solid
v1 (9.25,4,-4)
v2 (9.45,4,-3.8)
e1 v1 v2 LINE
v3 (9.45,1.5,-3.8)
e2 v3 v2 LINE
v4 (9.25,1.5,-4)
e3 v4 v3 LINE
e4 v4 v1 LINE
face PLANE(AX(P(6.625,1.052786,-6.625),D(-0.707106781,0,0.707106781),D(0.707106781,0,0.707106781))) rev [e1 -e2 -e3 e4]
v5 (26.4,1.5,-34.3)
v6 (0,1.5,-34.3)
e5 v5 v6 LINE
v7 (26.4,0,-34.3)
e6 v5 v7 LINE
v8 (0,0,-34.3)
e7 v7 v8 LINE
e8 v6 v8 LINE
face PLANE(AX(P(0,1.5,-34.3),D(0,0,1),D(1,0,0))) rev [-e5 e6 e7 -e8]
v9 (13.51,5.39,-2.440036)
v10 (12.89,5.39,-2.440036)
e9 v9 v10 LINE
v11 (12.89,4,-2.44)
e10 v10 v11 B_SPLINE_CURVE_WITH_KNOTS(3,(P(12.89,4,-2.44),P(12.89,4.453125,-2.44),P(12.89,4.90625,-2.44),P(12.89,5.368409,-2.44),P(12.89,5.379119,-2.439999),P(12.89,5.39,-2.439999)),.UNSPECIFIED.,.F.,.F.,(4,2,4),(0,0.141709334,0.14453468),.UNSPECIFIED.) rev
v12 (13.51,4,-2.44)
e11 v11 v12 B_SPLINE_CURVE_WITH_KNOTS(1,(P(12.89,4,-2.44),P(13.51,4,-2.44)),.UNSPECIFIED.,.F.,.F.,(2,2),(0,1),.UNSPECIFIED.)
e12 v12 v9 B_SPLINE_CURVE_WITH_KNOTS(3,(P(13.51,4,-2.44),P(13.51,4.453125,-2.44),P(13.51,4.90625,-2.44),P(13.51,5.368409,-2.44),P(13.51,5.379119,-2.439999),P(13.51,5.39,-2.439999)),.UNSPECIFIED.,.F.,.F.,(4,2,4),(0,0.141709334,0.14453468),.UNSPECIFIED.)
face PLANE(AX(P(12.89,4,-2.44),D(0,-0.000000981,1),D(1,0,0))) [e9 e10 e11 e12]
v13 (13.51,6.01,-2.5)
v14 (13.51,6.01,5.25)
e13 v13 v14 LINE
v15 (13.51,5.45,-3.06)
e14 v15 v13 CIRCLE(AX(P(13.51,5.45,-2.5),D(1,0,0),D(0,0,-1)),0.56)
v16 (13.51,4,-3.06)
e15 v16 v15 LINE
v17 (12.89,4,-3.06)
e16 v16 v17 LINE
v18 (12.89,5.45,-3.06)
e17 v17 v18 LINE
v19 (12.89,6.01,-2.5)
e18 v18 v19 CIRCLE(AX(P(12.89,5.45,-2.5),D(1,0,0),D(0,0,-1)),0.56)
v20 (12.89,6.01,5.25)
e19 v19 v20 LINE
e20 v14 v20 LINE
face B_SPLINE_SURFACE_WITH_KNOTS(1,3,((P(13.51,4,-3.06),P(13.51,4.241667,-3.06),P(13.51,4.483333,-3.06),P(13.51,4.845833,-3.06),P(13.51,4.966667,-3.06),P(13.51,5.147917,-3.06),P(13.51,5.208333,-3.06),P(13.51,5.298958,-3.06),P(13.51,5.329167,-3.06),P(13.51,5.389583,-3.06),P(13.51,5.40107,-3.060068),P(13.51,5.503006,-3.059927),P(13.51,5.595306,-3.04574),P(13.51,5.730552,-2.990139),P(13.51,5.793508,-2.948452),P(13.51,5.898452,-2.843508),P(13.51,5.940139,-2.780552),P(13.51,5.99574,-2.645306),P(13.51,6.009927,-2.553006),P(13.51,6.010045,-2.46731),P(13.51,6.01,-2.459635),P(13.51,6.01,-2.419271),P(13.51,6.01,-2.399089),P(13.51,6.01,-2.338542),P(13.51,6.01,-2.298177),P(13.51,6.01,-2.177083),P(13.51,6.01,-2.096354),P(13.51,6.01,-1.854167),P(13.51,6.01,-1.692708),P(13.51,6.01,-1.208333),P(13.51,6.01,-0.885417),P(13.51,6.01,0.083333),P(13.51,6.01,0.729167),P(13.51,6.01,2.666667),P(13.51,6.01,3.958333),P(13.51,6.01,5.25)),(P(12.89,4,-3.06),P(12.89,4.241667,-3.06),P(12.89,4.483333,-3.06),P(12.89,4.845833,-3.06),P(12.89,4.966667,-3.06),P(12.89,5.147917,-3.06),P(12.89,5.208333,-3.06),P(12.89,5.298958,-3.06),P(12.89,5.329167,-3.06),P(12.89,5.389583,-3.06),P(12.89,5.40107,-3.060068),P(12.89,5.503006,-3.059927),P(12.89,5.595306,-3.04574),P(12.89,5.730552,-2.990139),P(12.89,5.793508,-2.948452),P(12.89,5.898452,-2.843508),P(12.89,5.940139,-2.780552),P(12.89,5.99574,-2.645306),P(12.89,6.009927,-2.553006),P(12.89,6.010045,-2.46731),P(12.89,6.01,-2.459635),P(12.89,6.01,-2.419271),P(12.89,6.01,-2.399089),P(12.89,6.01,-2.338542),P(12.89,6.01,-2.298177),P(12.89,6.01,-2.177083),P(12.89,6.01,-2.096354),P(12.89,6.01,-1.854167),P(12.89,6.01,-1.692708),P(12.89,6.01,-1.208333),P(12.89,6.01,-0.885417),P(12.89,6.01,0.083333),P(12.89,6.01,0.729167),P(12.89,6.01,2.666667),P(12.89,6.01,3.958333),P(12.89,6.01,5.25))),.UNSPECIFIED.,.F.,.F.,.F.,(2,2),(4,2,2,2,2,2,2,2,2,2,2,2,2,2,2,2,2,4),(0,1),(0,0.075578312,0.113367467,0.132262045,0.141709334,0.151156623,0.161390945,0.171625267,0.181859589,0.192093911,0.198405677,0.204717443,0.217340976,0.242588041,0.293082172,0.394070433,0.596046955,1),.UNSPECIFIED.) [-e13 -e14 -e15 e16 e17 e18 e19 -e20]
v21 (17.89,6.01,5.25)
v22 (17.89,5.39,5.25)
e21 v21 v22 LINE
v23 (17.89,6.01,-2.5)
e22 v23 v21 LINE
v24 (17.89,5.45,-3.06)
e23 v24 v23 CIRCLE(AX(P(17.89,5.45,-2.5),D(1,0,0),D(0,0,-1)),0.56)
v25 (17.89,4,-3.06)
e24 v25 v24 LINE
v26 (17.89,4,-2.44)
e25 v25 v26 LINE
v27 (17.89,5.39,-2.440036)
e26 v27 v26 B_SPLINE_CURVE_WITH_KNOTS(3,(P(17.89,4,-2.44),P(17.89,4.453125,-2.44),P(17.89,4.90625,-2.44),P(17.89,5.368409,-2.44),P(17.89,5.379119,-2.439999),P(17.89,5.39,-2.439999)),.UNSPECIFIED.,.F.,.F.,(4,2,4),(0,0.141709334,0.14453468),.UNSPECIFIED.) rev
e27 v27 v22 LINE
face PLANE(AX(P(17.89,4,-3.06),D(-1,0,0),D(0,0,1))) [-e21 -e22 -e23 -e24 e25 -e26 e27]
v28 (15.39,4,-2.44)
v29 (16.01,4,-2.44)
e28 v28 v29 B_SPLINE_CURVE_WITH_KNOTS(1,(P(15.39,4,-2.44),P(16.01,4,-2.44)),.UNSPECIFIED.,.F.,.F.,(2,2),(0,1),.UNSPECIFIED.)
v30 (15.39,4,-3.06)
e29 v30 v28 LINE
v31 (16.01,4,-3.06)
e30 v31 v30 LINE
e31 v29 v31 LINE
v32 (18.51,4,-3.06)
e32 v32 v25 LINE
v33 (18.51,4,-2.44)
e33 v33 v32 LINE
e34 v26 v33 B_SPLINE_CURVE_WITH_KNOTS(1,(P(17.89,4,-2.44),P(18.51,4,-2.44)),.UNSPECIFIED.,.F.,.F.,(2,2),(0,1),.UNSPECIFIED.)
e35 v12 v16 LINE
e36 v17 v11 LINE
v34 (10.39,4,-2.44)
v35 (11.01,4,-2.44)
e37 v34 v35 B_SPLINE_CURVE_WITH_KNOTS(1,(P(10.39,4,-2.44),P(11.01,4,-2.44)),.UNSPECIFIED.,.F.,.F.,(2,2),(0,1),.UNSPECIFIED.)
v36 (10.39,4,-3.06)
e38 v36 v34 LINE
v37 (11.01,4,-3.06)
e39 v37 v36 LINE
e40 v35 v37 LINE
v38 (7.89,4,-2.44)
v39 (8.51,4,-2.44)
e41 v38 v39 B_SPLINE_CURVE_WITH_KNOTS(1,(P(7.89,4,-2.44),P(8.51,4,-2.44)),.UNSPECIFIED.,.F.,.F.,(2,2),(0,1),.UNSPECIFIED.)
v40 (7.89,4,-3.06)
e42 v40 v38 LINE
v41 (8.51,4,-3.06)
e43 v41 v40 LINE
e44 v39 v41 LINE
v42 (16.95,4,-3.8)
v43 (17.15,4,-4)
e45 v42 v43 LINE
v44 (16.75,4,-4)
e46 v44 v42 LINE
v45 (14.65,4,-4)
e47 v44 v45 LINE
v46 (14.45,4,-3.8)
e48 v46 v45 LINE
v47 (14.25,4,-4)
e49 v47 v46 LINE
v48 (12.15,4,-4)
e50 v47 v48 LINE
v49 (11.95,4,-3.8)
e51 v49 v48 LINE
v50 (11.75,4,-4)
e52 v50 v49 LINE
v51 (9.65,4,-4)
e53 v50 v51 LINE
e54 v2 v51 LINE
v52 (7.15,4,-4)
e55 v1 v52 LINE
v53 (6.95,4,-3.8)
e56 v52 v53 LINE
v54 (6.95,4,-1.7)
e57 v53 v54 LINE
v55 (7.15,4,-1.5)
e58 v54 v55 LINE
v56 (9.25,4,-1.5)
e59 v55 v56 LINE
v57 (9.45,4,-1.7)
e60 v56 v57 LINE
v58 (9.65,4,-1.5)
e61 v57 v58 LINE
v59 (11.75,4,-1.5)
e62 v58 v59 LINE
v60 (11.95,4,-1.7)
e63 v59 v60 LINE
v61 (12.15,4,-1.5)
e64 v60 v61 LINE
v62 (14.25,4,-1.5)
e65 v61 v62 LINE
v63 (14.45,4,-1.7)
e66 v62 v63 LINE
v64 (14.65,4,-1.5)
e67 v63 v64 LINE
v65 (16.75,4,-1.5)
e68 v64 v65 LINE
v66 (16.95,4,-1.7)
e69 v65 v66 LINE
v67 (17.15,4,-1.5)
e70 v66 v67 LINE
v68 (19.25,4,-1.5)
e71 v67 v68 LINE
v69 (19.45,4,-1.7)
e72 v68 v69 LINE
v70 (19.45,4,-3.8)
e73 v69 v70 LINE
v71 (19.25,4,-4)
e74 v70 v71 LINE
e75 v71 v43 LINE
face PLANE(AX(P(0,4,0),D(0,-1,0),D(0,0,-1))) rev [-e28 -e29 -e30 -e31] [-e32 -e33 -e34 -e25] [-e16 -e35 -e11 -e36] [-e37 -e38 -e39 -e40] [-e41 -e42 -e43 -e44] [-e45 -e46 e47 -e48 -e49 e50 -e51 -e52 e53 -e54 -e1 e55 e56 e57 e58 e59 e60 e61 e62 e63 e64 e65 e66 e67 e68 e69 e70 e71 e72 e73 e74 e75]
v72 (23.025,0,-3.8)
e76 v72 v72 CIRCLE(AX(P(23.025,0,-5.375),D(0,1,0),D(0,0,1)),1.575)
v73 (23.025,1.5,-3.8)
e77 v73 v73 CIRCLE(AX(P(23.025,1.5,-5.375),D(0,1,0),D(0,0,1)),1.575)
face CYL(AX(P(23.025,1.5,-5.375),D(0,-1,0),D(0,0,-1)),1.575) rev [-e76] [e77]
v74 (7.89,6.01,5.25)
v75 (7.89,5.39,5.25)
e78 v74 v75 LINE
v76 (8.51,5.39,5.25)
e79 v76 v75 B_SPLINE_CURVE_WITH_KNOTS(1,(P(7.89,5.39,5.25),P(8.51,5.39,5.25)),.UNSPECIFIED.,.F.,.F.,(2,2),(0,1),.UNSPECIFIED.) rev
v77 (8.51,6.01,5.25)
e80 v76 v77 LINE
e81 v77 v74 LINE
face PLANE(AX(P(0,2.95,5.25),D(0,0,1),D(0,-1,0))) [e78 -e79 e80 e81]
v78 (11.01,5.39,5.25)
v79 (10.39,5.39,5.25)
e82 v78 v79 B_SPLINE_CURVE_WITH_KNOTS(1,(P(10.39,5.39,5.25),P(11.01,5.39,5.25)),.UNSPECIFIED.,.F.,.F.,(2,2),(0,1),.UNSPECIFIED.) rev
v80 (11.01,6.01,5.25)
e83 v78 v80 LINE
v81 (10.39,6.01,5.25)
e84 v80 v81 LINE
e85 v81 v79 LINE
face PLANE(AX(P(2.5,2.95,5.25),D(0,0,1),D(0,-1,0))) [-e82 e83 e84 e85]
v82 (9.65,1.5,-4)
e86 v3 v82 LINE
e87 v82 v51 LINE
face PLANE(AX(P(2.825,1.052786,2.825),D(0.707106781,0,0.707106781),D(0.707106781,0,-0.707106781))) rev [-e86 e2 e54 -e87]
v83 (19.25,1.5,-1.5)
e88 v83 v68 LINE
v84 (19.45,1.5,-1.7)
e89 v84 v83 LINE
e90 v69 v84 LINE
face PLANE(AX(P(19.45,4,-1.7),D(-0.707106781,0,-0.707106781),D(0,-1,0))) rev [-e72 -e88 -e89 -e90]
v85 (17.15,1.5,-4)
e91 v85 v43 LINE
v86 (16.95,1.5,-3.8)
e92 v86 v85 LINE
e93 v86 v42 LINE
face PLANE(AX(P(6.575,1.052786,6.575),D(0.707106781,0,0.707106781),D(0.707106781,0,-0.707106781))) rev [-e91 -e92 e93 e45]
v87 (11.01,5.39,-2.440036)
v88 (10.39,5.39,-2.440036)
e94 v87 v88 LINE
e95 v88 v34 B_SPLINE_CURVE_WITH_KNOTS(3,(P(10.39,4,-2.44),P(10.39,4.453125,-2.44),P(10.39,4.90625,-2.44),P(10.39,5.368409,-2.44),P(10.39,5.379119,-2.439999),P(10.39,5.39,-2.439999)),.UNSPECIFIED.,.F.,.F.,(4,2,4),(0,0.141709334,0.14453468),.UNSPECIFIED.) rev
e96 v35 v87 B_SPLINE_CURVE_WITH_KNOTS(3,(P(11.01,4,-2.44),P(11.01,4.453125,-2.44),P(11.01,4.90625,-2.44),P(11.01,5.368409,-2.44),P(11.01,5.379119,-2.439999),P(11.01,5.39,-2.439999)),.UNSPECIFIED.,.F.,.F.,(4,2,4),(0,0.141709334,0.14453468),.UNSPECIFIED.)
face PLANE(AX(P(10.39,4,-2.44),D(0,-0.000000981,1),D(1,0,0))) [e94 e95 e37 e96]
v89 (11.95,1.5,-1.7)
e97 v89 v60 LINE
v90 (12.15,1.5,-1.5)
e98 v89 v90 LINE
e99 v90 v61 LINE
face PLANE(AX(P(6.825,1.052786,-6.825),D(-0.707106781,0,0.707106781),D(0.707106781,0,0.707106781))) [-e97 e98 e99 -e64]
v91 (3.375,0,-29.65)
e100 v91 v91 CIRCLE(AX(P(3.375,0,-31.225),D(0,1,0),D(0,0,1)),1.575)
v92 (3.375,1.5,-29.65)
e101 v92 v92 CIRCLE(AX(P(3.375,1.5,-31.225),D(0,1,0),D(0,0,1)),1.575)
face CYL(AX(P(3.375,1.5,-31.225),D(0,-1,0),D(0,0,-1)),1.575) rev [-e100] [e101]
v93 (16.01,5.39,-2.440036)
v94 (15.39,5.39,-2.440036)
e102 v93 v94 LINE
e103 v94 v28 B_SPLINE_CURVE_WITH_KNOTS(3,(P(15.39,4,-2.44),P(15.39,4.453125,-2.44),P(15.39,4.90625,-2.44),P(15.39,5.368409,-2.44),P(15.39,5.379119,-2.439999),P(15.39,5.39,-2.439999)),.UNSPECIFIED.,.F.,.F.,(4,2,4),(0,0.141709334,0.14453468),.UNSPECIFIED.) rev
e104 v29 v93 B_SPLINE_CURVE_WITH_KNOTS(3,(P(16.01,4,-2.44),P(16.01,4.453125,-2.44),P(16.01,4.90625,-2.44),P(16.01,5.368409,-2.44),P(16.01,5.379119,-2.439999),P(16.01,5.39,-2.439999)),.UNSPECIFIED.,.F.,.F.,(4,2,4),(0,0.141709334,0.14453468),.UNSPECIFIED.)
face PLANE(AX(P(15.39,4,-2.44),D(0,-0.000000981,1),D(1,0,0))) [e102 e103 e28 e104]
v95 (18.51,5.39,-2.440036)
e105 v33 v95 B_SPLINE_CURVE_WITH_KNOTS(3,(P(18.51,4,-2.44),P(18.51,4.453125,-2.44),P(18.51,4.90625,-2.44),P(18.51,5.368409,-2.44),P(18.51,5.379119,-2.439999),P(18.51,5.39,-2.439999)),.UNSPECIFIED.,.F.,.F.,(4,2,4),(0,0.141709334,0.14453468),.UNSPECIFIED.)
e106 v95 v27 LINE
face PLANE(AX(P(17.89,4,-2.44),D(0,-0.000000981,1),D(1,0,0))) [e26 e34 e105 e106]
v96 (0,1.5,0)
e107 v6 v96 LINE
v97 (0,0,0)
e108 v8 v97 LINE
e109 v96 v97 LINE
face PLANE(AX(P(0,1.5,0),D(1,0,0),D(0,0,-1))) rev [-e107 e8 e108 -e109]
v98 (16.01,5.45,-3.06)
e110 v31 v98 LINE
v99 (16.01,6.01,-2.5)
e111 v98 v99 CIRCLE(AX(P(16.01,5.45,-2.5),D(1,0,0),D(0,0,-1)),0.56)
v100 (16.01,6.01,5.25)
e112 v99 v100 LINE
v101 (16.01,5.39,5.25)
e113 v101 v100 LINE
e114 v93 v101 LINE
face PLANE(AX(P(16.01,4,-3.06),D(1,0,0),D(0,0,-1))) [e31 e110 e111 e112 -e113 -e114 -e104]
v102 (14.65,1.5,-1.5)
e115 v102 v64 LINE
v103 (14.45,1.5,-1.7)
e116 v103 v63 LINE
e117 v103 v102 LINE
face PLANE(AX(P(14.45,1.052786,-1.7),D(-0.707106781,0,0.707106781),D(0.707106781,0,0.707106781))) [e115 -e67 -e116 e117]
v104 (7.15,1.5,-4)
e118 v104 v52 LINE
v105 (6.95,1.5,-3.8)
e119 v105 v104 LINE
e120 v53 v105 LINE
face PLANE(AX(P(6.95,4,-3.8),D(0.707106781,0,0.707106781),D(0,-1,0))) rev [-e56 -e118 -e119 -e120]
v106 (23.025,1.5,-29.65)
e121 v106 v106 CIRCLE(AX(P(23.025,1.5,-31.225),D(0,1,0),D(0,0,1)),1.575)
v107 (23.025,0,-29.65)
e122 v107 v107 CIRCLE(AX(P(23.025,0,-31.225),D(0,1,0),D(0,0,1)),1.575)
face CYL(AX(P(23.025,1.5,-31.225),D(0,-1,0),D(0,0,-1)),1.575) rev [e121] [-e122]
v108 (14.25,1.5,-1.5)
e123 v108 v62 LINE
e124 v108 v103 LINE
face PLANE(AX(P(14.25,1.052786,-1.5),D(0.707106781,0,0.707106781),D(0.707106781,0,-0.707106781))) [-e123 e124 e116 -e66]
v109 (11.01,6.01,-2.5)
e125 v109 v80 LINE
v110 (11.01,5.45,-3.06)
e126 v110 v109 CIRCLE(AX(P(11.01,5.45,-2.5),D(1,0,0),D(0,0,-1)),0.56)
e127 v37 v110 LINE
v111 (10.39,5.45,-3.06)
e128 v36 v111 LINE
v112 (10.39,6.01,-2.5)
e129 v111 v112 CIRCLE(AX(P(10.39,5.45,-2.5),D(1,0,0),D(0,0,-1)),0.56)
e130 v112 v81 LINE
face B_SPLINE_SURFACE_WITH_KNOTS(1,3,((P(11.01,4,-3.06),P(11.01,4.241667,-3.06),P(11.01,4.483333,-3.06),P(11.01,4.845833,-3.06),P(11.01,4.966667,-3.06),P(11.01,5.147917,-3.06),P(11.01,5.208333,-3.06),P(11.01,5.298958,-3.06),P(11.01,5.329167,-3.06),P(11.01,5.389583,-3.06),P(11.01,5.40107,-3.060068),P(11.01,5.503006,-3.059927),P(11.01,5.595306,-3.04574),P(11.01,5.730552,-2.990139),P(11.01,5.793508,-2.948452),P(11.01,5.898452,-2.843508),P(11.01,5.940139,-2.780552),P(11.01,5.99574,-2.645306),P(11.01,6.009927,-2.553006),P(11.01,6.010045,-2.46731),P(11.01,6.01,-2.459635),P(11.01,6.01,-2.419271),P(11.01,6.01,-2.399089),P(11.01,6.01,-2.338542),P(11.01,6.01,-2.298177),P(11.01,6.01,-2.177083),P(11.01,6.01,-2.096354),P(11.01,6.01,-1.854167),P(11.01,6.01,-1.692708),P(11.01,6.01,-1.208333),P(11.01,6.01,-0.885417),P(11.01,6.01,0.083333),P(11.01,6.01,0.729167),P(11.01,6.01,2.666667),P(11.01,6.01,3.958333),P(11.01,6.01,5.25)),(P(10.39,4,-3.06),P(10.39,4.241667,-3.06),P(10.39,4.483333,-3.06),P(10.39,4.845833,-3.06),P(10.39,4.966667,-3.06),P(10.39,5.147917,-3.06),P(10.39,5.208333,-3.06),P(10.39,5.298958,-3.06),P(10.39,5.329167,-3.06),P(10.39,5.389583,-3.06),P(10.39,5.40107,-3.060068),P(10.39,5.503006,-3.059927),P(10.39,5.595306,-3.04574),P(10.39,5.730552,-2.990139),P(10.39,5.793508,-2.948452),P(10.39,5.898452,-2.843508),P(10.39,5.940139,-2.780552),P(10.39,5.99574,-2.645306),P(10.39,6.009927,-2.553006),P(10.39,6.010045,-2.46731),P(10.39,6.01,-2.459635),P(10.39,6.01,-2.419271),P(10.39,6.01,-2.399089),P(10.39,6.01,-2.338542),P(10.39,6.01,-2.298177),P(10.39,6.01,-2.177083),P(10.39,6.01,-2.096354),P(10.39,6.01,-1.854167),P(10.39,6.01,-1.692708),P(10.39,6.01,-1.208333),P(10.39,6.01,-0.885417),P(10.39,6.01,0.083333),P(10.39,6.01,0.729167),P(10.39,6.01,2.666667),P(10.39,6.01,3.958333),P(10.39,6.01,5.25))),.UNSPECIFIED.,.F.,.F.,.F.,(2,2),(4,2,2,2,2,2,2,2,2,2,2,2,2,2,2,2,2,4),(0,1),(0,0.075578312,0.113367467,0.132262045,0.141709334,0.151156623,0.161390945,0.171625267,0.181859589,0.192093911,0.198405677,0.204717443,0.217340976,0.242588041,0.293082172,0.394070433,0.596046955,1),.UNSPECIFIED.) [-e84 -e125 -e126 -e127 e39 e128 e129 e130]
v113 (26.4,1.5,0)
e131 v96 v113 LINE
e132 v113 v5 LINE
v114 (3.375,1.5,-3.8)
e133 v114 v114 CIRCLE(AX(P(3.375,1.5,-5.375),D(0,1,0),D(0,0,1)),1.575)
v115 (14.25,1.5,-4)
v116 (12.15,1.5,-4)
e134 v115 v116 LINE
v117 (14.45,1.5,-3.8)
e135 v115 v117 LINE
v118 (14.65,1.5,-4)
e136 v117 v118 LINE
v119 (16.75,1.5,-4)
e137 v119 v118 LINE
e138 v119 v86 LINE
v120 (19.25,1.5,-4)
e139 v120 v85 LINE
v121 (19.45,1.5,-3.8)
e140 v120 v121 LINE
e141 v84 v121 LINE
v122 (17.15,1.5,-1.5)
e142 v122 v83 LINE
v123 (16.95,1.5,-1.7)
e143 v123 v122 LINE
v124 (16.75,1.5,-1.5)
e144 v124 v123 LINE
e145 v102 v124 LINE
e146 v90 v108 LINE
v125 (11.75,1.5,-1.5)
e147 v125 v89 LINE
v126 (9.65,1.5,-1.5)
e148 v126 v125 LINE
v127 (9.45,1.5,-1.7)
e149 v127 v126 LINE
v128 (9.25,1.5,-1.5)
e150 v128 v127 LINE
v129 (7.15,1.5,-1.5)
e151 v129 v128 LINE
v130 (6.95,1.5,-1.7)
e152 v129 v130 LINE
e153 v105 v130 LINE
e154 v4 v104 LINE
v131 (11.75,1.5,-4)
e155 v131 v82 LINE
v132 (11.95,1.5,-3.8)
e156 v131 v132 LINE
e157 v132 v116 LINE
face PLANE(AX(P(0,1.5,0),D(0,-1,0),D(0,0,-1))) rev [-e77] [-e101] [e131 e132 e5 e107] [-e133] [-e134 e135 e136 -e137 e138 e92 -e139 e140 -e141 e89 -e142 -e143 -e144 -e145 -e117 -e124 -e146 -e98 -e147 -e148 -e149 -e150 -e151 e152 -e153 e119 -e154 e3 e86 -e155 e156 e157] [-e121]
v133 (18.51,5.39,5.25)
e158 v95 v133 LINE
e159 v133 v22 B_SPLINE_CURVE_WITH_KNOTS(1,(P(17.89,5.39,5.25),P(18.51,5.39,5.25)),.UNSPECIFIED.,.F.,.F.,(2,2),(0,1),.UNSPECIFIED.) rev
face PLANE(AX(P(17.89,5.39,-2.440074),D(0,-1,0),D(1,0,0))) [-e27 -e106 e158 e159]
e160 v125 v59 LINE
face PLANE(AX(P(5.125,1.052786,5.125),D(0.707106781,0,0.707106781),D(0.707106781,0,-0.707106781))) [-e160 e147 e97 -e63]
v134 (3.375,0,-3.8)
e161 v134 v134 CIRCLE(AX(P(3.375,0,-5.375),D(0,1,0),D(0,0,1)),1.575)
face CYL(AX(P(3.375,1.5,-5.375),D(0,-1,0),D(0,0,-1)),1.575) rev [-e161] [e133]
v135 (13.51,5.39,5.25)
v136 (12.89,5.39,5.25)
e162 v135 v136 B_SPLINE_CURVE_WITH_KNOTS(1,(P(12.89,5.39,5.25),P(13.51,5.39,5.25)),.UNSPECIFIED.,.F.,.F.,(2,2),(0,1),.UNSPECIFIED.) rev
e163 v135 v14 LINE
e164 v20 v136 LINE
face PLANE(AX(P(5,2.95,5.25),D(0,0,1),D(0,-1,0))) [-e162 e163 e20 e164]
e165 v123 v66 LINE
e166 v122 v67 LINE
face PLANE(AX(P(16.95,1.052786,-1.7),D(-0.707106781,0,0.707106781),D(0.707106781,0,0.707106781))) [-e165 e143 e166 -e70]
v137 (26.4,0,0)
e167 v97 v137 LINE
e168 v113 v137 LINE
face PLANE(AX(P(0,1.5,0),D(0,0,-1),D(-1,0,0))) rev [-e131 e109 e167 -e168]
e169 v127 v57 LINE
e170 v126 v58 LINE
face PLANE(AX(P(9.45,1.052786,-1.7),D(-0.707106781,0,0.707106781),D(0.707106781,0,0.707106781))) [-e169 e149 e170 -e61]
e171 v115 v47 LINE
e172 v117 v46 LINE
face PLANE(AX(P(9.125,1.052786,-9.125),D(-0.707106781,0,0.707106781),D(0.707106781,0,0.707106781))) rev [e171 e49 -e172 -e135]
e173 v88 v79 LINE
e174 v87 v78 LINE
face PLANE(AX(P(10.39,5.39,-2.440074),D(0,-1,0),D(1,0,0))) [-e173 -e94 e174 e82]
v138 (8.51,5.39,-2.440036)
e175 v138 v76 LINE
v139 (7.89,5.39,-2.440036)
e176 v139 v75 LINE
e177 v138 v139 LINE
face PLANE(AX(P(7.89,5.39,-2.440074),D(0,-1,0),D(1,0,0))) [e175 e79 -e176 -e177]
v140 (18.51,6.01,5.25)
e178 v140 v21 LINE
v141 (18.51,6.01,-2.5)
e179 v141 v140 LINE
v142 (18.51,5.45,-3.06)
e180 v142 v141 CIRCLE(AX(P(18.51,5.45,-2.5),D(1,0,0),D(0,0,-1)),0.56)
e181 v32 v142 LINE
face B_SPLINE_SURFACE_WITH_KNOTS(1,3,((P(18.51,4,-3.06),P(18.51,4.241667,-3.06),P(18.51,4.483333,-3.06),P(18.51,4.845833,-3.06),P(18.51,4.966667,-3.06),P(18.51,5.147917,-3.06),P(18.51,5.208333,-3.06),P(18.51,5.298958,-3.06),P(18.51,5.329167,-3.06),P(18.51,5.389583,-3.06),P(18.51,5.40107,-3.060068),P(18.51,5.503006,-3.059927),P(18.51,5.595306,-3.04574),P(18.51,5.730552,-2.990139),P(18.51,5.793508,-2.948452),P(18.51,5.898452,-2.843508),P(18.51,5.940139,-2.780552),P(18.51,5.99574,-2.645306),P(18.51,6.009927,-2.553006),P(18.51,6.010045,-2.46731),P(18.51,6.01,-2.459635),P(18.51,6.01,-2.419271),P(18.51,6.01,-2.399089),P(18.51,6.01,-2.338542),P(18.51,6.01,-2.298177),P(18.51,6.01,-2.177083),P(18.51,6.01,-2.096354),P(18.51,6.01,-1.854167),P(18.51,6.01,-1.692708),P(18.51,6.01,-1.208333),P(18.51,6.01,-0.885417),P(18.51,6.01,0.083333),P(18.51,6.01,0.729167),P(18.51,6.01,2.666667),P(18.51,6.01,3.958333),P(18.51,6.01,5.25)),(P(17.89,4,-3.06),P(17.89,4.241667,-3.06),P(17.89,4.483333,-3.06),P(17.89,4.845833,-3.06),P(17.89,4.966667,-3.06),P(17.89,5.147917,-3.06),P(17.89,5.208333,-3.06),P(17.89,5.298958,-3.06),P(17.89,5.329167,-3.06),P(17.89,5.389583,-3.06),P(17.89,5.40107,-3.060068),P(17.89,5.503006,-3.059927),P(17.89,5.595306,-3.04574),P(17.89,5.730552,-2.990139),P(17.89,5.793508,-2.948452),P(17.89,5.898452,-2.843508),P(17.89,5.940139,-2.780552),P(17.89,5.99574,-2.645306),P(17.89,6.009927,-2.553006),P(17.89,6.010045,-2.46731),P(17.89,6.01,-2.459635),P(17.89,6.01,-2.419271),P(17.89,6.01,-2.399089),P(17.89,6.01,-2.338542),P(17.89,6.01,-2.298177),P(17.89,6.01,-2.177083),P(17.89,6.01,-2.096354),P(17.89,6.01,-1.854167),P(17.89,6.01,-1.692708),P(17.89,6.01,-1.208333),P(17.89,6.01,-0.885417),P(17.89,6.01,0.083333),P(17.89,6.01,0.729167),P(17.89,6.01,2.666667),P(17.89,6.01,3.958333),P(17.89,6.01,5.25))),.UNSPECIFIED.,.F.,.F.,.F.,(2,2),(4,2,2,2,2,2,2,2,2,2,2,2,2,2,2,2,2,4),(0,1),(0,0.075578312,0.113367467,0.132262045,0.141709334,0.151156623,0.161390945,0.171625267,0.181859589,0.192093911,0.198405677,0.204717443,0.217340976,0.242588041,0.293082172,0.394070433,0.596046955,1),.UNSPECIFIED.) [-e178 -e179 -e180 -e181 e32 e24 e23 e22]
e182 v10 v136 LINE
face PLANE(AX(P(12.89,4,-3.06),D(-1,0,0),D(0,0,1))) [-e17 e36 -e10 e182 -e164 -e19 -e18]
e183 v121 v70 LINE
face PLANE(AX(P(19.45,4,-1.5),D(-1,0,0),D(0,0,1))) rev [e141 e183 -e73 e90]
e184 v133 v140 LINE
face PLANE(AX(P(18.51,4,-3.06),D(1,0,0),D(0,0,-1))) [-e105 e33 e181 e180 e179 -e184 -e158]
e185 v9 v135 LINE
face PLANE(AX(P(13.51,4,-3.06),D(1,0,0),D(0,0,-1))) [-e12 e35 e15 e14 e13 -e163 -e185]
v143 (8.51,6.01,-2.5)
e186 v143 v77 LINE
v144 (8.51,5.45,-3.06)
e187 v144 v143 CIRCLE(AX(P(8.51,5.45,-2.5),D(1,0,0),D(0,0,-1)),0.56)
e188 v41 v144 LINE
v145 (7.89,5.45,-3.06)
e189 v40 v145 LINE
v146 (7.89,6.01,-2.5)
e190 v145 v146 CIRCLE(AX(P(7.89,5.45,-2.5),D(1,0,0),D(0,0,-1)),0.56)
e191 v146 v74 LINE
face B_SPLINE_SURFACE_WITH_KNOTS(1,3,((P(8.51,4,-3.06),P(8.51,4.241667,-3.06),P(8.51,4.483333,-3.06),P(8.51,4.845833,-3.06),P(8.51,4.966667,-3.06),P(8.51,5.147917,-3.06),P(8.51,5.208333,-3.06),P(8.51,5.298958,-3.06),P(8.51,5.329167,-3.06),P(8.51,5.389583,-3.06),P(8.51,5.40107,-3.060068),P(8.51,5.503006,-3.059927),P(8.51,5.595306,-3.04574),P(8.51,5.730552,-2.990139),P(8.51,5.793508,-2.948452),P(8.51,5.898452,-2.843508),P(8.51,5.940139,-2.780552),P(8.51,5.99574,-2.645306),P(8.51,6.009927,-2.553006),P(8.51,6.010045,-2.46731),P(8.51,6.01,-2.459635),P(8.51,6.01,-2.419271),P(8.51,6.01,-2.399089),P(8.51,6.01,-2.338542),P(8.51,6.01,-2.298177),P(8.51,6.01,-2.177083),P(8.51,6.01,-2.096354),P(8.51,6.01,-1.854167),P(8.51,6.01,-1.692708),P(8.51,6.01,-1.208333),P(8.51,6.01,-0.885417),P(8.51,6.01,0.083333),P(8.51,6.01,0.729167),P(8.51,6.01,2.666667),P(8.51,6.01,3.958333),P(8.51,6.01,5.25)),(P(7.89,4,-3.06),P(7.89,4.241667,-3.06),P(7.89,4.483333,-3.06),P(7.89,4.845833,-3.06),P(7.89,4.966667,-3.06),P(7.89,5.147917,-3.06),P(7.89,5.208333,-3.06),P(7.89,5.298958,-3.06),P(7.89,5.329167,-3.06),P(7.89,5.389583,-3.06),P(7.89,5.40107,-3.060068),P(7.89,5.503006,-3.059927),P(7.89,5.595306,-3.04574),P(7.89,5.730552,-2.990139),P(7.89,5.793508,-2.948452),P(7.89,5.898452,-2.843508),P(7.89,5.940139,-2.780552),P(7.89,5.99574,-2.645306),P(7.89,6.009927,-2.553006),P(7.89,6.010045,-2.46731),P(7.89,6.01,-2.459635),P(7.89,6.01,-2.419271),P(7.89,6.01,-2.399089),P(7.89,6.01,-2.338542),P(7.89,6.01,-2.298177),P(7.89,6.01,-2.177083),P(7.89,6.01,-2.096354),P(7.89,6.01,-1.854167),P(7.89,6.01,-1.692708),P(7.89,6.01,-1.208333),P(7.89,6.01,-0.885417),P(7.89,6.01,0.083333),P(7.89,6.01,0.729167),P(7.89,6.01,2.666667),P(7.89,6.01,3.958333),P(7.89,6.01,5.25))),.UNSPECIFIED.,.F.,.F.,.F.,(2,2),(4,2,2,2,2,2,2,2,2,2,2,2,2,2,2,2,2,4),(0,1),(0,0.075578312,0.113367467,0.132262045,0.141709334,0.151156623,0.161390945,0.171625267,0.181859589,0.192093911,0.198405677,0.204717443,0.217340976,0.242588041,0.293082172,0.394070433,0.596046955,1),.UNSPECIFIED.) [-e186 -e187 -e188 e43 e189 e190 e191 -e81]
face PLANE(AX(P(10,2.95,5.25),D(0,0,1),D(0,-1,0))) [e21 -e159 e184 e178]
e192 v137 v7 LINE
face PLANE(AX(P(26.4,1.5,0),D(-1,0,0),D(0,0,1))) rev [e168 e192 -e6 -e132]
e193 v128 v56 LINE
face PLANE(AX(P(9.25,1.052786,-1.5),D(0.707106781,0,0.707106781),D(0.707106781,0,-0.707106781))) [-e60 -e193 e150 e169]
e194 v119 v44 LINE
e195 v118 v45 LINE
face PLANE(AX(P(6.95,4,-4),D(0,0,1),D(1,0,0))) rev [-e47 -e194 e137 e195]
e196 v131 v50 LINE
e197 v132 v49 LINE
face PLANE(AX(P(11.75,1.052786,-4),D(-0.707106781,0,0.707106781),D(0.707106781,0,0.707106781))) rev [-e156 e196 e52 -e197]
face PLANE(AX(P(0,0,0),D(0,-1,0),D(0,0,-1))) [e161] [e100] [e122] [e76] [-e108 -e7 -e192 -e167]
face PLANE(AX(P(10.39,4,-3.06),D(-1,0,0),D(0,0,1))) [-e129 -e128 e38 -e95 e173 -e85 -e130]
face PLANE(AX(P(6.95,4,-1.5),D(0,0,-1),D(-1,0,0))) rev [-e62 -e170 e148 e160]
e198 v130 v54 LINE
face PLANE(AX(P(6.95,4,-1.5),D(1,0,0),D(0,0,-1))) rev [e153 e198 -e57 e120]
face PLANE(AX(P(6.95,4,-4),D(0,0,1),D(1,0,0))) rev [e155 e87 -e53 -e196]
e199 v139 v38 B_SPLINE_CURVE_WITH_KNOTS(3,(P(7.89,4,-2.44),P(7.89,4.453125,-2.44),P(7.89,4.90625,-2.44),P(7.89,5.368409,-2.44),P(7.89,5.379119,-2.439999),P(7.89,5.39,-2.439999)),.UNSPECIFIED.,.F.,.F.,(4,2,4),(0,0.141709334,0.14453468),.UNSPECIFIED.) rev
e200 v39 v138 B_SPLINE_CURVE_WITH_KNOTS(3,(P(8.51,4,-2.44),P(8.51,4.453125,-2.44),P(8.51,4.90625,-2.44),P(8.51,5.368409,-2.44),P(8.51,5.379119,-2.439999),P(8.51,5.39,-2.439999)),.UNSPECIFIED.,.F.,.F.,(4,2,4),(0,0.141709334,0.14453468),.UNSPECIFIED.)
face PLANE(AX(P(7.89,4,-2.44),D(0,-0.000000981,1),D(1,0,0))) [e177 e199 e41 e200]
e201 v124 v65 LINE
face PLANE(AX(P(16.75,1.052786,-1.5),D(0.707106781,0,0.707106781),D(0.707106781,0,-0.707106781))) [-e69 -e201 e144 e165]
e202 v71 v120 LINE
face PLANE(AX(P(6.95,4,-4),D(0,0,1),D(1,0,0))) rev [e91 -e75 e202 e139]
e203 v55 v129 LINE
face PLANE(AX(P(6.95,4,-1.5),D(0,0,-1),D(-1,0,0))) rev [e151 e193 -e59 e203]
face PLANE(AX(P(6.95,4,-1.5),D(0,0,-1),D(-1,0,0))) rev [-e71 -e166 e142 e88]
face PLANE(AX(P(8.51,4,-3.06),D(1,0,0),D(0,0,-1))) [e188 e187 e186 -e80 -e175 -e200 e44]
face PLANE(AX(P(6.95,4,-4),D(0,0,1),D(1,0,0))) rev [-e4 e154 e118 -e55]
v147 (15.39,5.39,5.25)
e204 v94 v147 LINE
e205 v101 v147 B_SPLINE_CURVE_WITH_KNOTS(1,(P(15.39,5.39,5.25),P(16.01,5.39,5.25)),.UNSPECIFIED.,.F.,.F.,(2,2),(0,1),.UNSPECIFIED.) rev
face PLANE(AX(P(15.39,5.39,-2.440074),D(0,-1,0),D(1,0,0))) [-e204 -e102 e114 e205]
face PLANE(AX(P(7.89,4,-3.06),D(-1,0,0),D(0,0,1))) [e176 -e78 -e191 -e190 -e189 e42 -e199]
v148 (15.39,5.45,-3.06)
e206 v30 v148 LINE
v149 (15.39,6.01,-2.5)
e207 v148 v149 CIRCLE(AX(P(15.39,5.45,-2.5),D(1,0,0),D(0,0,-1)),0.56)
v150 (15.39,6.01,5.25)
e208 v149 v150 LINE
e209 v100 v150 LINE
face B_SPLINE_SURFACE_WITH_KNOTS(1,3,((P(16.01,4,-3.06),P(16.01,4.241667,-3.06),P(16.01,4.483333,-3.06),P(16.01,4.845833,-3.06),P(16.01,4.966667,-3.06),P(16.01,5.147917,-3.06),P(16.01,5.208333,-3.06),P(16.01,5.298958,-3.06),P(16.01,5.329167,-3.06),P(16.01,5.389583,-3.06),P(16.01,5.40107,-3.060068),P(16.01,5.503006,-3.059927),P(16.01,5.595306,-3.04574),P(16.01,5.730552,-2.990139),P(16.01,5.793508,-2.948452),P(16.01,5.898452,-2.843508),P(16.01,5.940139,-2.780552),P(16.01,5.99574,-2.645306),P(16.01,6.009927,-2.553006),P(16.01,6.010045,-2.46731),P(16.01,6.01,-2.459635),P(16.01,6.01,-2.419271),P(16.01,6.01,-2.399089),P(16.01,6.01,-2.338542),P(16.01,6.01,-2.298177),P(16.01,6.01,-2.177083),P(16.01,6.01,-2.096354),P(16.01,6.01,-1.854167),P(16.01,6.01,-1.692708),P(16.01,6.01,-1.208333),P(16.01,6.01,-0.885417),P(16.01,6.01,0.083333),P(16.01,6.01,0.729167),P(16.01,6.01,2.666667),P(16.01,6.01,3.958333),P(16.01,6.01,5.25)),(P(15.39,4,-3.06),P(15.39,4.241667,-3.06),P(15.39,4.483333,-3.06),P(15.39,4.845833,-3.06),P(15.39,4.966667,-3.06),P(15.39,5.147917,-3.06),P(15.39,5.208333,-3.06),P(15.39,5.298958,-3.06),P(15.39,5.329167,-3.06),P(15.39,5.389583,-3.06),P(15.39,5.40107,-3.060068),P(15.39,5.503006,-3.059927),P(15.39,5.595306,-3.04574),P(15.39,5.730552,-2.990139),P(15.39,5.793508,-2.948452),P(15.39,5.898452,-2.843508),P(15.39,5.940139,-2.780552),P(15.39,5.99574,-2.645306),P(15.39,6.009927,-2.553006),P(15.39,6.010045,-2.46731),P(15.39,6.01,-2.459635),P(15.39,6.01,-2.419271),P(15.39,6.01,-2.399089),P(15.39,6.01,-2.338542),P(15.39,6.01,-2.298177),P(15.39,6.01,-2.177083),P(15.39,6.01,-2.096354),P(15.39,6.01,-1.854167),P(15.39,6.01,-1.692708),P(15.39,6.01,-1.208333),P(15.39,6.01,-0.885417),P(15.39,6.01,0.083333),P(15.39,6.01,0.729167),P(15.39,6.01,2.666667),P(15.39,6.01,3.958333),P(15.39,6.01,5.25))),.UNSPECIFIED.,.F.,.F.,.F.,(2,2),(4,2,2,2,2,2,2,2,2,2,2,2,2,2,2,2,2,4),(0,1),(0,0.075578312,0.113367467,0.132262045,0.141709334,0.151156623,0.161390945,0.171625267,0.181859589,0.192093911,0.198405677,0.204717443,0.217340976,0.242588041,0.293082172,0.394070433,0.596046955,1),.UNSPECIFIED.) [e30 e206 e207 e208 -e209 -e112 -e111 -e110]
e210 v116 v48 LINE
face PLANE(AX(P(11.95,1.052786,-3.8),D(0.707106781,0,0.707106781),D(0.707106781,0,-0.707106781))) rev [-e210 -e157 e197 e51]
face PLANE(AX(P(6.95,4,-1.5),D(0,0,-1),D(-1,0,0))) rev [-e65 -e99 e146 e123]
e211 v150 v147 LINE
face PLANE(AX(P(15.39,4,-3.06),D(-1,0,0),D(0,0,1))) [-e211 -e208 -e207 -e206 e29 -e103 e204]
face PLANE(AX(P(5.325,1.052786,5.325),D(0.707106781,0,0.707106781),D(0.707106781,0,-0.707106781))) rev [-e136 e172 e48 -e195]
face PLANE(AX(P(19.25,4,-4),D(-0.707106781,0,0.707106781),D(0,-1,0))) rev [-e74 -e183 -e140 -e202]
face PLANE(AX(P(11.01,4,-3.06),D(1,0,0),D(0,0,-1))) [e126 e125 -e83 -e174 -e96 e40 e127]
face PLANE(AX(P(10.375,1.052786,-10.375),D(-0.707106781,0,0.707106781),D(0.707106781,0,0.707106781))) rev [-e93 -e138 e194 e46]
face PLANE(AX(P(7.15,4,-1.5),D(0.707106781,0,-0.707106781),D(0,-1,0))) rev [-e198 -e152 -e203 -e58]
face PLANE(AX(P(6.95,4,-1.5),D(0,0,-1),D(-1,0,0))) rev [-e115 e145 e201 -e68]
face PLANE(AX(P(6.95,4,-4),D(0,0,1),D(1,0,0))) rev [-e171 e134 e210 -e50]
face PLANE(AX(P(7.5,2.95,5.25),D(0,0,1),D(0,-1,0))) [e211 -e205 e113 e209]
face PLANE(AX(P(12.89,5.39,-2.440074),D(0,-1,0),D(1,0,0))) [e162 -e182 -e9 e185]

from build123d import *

# Parameters (mm, degrees)
SKETCH1_W           = 26.4
SKETCH1_H           = 34.3
SKETCH1_R           = 1.575
BOSS_EXTRUDE1_DEPTH = 1.5
SKETCH3_W           = 12.5
SKETCH3_H           = 2.5
BOSS_EXTRUDE2_DEPTH = 2.5
SWEEP3_START        = 7.89
SWEEP3_DEPTH        = 0.62
LPATTERN1_COUNT     = 5
LPATTERN1_PITCH     = 2.5
CUT_EXTRUDE1_DEPTH  = 2.5
CHAMFER1_SIZE       = 0.2


# Read off the part's stored shape, not the designer's step: Sweep3
with BuildPart() as part:
    # Sketch1 → Boss-Extrude1 (new body)
    with BuildSketch(Plane(origin=(0, 0, 0), x_dir=(1, 0, 0), z_dir=(0, 1, 0))):
        with Locations((13.2, 17.15)):
            Rectangle(SKETCH1_W, SKETCH1_H)
        with Locations(Location((3.375, 31.225, 0), (0, 0, 270))):
            Circle(SKETCH1_R, mode=Mode.SUBTRACT)
        with Locations(Location((23.025, 31.225, 0), (0, 0, 270))):
            Circle(SKETCH1_R, mode=Mode.SUBTRACT)
        with Locations(Location((23.025, 5.375, 0), (0, 0, 270))):
            Circle(SKETCH1_R, mode=Mode.SUBTRACT)
        with Locations(Location((3.375, 5.375, 0), (0, 0, 270))):
            Circle(SKETCH1_R, mode=Mode.SUBTRACT)
    extrude(amount=BOSS_EXTRUDE1_DEPTH)

    # Sketch3 → Boss-Extrude2 (add)
    with BuildSketch(Plane(origin=(0, 1.5, 0), x_dir=(1, 0, 0), z_dir=(0, 1, 0))):
        with Locations((13.2, 2.75)):
            Rectangle(SKETCH3_W, SKETCH3_H)
    extrude(amount=BOSS_EXTRUDE2_DEPTH)

    # Sweep3 outline → Sweep3 (add)
    with BuildSketch(Plane.YZ.offset(SWEEP3_START)):
        with BuildLine():
            Line((4, -2.44), (4, -3.06))
            add(Edge.make_bspline(
                [(4, -3.06), (4.241666667, -3.06), (4.483333333, -3.06), (4.845833333, -3.06), (4.966666667, -3.06), (5.147916667, -3.06), (5.208333333, -3.06), (5.298958333, -3.06), (5.329166667, -3.06), (5.389583333, -3.06), (5.401070283, -3.060067636), (5.503005944, -3.05992673), (5.595306319, -3.045739717), (5.730552262, -2.99013888), (5.793507671, -2.948451924), (5.898451924, -2.843507671), (5.94013888, -2.780552262), (5.995739717, -2.645306319), (6.00992673, -2.553005944), (6.010045188, -2.467309888), (6.01, -2.459635417), (6.01, -2.419270833), (6.01, -2.399088542), (6.01, -2.338541667), (6.01, -2.298177083), (6.01, -2.177083333), (6.01, -2.096354167), (6.01, -1.854166667), (6.01, -1.692708333), (6.01, -1.208333333), (6.01, -0.885416667), (6.01, 0.083333333), (6.01, 0.729166667), (6.01, 2.666666667), (6.01, 3.958333333), (6.01, 5.25)],
                knots=[0, 0, 0, 0, 0.075578312, 0.075578312, 0.113367467, 0.113367467, 0.132262045, 0.132262045, 0.141709334, 0.141709334, 0.151156623, 0.151156623, 0.161390945, 0.161390945, 0.171625267, 0.171625267, 0.181859589, 0.181859589, 0.192093911, 0.192093911, 0.198405677, 0.198405677, 0.204717443, 0.204717443, 0.217340976, 0.217340976, 0.242588041, 0.242588041, 0.293082172, 0.293082172, 0.394070433, 0.394070433, 0.596046955, 0.596046955, 1, 1, 1, 1], degree=3))
            Line((6.01, 5.25), (5.39, 5.25))
            Line((5.39, 5.25), (5.389999999, -2.440036459))
            Line((5.389999999, -2.440036459), (4, -2.44))
        make_face()
    sweep3 = extrude(amount=SWEEP3_DEPTH)

    # LPattern1: Sweep3 ×5
    with Locations(*[(i * LPATTERN1_PITCH, 0, 0) for i in range(1, LPATTERN1_COUNT)]):
        add(sweep3)

    # Sketch13 → Cut-Extrude1 (cut)
    with BuildSketch(Plane(origin=(0, 4, 0), x_dir=(1, 0, 0), z_dir=(0, 1, 0))):
        Polygon((11.95, 1.7), (11.75, 1.5), (12.15, 1.5), align=None)
        Polygon((16.75, 4), (16.95, 3.8), (17.15, 4), align=None)
        Polygon((14.45, 3.8), (14.65, 4), (14.25, 4), align=None)
        Polygon((9.45, 3.8), (9.65, 4), (9.25, 4), align=None)
        Polygon((9.25, 1.5), (9.45, 1.7), (9.65, 1.5), align=None)
        Polygon((14.45, 1.7), (14.65, 1.5), (14.25, 1.5), align=None)
        Polygon((16.75, 1.5), (17.15, 1.5), (16.95, 1.7), align=None)
        Polygon((12.15, 4), (11.75, 4), (11.95, 3.8), align=None)
    extrude(amount=-CUT_EXTRUDE1_DEPTH, mode=Mode.SUBTRACT)

    # Chamfer1
    chamfer1_edges = [part.edges().sort_by_distance(p)[0] for p in [
        (6.95, 2.75, -4),
        (6.95, 2.75, -1.5),
        (19.45, 2.75, -1.5),
        (19.45, 2.75, -4),
    ]]
    chamfer(chamfer1_edges, length=CHAMFER1_SIZE)


solid = part.part
